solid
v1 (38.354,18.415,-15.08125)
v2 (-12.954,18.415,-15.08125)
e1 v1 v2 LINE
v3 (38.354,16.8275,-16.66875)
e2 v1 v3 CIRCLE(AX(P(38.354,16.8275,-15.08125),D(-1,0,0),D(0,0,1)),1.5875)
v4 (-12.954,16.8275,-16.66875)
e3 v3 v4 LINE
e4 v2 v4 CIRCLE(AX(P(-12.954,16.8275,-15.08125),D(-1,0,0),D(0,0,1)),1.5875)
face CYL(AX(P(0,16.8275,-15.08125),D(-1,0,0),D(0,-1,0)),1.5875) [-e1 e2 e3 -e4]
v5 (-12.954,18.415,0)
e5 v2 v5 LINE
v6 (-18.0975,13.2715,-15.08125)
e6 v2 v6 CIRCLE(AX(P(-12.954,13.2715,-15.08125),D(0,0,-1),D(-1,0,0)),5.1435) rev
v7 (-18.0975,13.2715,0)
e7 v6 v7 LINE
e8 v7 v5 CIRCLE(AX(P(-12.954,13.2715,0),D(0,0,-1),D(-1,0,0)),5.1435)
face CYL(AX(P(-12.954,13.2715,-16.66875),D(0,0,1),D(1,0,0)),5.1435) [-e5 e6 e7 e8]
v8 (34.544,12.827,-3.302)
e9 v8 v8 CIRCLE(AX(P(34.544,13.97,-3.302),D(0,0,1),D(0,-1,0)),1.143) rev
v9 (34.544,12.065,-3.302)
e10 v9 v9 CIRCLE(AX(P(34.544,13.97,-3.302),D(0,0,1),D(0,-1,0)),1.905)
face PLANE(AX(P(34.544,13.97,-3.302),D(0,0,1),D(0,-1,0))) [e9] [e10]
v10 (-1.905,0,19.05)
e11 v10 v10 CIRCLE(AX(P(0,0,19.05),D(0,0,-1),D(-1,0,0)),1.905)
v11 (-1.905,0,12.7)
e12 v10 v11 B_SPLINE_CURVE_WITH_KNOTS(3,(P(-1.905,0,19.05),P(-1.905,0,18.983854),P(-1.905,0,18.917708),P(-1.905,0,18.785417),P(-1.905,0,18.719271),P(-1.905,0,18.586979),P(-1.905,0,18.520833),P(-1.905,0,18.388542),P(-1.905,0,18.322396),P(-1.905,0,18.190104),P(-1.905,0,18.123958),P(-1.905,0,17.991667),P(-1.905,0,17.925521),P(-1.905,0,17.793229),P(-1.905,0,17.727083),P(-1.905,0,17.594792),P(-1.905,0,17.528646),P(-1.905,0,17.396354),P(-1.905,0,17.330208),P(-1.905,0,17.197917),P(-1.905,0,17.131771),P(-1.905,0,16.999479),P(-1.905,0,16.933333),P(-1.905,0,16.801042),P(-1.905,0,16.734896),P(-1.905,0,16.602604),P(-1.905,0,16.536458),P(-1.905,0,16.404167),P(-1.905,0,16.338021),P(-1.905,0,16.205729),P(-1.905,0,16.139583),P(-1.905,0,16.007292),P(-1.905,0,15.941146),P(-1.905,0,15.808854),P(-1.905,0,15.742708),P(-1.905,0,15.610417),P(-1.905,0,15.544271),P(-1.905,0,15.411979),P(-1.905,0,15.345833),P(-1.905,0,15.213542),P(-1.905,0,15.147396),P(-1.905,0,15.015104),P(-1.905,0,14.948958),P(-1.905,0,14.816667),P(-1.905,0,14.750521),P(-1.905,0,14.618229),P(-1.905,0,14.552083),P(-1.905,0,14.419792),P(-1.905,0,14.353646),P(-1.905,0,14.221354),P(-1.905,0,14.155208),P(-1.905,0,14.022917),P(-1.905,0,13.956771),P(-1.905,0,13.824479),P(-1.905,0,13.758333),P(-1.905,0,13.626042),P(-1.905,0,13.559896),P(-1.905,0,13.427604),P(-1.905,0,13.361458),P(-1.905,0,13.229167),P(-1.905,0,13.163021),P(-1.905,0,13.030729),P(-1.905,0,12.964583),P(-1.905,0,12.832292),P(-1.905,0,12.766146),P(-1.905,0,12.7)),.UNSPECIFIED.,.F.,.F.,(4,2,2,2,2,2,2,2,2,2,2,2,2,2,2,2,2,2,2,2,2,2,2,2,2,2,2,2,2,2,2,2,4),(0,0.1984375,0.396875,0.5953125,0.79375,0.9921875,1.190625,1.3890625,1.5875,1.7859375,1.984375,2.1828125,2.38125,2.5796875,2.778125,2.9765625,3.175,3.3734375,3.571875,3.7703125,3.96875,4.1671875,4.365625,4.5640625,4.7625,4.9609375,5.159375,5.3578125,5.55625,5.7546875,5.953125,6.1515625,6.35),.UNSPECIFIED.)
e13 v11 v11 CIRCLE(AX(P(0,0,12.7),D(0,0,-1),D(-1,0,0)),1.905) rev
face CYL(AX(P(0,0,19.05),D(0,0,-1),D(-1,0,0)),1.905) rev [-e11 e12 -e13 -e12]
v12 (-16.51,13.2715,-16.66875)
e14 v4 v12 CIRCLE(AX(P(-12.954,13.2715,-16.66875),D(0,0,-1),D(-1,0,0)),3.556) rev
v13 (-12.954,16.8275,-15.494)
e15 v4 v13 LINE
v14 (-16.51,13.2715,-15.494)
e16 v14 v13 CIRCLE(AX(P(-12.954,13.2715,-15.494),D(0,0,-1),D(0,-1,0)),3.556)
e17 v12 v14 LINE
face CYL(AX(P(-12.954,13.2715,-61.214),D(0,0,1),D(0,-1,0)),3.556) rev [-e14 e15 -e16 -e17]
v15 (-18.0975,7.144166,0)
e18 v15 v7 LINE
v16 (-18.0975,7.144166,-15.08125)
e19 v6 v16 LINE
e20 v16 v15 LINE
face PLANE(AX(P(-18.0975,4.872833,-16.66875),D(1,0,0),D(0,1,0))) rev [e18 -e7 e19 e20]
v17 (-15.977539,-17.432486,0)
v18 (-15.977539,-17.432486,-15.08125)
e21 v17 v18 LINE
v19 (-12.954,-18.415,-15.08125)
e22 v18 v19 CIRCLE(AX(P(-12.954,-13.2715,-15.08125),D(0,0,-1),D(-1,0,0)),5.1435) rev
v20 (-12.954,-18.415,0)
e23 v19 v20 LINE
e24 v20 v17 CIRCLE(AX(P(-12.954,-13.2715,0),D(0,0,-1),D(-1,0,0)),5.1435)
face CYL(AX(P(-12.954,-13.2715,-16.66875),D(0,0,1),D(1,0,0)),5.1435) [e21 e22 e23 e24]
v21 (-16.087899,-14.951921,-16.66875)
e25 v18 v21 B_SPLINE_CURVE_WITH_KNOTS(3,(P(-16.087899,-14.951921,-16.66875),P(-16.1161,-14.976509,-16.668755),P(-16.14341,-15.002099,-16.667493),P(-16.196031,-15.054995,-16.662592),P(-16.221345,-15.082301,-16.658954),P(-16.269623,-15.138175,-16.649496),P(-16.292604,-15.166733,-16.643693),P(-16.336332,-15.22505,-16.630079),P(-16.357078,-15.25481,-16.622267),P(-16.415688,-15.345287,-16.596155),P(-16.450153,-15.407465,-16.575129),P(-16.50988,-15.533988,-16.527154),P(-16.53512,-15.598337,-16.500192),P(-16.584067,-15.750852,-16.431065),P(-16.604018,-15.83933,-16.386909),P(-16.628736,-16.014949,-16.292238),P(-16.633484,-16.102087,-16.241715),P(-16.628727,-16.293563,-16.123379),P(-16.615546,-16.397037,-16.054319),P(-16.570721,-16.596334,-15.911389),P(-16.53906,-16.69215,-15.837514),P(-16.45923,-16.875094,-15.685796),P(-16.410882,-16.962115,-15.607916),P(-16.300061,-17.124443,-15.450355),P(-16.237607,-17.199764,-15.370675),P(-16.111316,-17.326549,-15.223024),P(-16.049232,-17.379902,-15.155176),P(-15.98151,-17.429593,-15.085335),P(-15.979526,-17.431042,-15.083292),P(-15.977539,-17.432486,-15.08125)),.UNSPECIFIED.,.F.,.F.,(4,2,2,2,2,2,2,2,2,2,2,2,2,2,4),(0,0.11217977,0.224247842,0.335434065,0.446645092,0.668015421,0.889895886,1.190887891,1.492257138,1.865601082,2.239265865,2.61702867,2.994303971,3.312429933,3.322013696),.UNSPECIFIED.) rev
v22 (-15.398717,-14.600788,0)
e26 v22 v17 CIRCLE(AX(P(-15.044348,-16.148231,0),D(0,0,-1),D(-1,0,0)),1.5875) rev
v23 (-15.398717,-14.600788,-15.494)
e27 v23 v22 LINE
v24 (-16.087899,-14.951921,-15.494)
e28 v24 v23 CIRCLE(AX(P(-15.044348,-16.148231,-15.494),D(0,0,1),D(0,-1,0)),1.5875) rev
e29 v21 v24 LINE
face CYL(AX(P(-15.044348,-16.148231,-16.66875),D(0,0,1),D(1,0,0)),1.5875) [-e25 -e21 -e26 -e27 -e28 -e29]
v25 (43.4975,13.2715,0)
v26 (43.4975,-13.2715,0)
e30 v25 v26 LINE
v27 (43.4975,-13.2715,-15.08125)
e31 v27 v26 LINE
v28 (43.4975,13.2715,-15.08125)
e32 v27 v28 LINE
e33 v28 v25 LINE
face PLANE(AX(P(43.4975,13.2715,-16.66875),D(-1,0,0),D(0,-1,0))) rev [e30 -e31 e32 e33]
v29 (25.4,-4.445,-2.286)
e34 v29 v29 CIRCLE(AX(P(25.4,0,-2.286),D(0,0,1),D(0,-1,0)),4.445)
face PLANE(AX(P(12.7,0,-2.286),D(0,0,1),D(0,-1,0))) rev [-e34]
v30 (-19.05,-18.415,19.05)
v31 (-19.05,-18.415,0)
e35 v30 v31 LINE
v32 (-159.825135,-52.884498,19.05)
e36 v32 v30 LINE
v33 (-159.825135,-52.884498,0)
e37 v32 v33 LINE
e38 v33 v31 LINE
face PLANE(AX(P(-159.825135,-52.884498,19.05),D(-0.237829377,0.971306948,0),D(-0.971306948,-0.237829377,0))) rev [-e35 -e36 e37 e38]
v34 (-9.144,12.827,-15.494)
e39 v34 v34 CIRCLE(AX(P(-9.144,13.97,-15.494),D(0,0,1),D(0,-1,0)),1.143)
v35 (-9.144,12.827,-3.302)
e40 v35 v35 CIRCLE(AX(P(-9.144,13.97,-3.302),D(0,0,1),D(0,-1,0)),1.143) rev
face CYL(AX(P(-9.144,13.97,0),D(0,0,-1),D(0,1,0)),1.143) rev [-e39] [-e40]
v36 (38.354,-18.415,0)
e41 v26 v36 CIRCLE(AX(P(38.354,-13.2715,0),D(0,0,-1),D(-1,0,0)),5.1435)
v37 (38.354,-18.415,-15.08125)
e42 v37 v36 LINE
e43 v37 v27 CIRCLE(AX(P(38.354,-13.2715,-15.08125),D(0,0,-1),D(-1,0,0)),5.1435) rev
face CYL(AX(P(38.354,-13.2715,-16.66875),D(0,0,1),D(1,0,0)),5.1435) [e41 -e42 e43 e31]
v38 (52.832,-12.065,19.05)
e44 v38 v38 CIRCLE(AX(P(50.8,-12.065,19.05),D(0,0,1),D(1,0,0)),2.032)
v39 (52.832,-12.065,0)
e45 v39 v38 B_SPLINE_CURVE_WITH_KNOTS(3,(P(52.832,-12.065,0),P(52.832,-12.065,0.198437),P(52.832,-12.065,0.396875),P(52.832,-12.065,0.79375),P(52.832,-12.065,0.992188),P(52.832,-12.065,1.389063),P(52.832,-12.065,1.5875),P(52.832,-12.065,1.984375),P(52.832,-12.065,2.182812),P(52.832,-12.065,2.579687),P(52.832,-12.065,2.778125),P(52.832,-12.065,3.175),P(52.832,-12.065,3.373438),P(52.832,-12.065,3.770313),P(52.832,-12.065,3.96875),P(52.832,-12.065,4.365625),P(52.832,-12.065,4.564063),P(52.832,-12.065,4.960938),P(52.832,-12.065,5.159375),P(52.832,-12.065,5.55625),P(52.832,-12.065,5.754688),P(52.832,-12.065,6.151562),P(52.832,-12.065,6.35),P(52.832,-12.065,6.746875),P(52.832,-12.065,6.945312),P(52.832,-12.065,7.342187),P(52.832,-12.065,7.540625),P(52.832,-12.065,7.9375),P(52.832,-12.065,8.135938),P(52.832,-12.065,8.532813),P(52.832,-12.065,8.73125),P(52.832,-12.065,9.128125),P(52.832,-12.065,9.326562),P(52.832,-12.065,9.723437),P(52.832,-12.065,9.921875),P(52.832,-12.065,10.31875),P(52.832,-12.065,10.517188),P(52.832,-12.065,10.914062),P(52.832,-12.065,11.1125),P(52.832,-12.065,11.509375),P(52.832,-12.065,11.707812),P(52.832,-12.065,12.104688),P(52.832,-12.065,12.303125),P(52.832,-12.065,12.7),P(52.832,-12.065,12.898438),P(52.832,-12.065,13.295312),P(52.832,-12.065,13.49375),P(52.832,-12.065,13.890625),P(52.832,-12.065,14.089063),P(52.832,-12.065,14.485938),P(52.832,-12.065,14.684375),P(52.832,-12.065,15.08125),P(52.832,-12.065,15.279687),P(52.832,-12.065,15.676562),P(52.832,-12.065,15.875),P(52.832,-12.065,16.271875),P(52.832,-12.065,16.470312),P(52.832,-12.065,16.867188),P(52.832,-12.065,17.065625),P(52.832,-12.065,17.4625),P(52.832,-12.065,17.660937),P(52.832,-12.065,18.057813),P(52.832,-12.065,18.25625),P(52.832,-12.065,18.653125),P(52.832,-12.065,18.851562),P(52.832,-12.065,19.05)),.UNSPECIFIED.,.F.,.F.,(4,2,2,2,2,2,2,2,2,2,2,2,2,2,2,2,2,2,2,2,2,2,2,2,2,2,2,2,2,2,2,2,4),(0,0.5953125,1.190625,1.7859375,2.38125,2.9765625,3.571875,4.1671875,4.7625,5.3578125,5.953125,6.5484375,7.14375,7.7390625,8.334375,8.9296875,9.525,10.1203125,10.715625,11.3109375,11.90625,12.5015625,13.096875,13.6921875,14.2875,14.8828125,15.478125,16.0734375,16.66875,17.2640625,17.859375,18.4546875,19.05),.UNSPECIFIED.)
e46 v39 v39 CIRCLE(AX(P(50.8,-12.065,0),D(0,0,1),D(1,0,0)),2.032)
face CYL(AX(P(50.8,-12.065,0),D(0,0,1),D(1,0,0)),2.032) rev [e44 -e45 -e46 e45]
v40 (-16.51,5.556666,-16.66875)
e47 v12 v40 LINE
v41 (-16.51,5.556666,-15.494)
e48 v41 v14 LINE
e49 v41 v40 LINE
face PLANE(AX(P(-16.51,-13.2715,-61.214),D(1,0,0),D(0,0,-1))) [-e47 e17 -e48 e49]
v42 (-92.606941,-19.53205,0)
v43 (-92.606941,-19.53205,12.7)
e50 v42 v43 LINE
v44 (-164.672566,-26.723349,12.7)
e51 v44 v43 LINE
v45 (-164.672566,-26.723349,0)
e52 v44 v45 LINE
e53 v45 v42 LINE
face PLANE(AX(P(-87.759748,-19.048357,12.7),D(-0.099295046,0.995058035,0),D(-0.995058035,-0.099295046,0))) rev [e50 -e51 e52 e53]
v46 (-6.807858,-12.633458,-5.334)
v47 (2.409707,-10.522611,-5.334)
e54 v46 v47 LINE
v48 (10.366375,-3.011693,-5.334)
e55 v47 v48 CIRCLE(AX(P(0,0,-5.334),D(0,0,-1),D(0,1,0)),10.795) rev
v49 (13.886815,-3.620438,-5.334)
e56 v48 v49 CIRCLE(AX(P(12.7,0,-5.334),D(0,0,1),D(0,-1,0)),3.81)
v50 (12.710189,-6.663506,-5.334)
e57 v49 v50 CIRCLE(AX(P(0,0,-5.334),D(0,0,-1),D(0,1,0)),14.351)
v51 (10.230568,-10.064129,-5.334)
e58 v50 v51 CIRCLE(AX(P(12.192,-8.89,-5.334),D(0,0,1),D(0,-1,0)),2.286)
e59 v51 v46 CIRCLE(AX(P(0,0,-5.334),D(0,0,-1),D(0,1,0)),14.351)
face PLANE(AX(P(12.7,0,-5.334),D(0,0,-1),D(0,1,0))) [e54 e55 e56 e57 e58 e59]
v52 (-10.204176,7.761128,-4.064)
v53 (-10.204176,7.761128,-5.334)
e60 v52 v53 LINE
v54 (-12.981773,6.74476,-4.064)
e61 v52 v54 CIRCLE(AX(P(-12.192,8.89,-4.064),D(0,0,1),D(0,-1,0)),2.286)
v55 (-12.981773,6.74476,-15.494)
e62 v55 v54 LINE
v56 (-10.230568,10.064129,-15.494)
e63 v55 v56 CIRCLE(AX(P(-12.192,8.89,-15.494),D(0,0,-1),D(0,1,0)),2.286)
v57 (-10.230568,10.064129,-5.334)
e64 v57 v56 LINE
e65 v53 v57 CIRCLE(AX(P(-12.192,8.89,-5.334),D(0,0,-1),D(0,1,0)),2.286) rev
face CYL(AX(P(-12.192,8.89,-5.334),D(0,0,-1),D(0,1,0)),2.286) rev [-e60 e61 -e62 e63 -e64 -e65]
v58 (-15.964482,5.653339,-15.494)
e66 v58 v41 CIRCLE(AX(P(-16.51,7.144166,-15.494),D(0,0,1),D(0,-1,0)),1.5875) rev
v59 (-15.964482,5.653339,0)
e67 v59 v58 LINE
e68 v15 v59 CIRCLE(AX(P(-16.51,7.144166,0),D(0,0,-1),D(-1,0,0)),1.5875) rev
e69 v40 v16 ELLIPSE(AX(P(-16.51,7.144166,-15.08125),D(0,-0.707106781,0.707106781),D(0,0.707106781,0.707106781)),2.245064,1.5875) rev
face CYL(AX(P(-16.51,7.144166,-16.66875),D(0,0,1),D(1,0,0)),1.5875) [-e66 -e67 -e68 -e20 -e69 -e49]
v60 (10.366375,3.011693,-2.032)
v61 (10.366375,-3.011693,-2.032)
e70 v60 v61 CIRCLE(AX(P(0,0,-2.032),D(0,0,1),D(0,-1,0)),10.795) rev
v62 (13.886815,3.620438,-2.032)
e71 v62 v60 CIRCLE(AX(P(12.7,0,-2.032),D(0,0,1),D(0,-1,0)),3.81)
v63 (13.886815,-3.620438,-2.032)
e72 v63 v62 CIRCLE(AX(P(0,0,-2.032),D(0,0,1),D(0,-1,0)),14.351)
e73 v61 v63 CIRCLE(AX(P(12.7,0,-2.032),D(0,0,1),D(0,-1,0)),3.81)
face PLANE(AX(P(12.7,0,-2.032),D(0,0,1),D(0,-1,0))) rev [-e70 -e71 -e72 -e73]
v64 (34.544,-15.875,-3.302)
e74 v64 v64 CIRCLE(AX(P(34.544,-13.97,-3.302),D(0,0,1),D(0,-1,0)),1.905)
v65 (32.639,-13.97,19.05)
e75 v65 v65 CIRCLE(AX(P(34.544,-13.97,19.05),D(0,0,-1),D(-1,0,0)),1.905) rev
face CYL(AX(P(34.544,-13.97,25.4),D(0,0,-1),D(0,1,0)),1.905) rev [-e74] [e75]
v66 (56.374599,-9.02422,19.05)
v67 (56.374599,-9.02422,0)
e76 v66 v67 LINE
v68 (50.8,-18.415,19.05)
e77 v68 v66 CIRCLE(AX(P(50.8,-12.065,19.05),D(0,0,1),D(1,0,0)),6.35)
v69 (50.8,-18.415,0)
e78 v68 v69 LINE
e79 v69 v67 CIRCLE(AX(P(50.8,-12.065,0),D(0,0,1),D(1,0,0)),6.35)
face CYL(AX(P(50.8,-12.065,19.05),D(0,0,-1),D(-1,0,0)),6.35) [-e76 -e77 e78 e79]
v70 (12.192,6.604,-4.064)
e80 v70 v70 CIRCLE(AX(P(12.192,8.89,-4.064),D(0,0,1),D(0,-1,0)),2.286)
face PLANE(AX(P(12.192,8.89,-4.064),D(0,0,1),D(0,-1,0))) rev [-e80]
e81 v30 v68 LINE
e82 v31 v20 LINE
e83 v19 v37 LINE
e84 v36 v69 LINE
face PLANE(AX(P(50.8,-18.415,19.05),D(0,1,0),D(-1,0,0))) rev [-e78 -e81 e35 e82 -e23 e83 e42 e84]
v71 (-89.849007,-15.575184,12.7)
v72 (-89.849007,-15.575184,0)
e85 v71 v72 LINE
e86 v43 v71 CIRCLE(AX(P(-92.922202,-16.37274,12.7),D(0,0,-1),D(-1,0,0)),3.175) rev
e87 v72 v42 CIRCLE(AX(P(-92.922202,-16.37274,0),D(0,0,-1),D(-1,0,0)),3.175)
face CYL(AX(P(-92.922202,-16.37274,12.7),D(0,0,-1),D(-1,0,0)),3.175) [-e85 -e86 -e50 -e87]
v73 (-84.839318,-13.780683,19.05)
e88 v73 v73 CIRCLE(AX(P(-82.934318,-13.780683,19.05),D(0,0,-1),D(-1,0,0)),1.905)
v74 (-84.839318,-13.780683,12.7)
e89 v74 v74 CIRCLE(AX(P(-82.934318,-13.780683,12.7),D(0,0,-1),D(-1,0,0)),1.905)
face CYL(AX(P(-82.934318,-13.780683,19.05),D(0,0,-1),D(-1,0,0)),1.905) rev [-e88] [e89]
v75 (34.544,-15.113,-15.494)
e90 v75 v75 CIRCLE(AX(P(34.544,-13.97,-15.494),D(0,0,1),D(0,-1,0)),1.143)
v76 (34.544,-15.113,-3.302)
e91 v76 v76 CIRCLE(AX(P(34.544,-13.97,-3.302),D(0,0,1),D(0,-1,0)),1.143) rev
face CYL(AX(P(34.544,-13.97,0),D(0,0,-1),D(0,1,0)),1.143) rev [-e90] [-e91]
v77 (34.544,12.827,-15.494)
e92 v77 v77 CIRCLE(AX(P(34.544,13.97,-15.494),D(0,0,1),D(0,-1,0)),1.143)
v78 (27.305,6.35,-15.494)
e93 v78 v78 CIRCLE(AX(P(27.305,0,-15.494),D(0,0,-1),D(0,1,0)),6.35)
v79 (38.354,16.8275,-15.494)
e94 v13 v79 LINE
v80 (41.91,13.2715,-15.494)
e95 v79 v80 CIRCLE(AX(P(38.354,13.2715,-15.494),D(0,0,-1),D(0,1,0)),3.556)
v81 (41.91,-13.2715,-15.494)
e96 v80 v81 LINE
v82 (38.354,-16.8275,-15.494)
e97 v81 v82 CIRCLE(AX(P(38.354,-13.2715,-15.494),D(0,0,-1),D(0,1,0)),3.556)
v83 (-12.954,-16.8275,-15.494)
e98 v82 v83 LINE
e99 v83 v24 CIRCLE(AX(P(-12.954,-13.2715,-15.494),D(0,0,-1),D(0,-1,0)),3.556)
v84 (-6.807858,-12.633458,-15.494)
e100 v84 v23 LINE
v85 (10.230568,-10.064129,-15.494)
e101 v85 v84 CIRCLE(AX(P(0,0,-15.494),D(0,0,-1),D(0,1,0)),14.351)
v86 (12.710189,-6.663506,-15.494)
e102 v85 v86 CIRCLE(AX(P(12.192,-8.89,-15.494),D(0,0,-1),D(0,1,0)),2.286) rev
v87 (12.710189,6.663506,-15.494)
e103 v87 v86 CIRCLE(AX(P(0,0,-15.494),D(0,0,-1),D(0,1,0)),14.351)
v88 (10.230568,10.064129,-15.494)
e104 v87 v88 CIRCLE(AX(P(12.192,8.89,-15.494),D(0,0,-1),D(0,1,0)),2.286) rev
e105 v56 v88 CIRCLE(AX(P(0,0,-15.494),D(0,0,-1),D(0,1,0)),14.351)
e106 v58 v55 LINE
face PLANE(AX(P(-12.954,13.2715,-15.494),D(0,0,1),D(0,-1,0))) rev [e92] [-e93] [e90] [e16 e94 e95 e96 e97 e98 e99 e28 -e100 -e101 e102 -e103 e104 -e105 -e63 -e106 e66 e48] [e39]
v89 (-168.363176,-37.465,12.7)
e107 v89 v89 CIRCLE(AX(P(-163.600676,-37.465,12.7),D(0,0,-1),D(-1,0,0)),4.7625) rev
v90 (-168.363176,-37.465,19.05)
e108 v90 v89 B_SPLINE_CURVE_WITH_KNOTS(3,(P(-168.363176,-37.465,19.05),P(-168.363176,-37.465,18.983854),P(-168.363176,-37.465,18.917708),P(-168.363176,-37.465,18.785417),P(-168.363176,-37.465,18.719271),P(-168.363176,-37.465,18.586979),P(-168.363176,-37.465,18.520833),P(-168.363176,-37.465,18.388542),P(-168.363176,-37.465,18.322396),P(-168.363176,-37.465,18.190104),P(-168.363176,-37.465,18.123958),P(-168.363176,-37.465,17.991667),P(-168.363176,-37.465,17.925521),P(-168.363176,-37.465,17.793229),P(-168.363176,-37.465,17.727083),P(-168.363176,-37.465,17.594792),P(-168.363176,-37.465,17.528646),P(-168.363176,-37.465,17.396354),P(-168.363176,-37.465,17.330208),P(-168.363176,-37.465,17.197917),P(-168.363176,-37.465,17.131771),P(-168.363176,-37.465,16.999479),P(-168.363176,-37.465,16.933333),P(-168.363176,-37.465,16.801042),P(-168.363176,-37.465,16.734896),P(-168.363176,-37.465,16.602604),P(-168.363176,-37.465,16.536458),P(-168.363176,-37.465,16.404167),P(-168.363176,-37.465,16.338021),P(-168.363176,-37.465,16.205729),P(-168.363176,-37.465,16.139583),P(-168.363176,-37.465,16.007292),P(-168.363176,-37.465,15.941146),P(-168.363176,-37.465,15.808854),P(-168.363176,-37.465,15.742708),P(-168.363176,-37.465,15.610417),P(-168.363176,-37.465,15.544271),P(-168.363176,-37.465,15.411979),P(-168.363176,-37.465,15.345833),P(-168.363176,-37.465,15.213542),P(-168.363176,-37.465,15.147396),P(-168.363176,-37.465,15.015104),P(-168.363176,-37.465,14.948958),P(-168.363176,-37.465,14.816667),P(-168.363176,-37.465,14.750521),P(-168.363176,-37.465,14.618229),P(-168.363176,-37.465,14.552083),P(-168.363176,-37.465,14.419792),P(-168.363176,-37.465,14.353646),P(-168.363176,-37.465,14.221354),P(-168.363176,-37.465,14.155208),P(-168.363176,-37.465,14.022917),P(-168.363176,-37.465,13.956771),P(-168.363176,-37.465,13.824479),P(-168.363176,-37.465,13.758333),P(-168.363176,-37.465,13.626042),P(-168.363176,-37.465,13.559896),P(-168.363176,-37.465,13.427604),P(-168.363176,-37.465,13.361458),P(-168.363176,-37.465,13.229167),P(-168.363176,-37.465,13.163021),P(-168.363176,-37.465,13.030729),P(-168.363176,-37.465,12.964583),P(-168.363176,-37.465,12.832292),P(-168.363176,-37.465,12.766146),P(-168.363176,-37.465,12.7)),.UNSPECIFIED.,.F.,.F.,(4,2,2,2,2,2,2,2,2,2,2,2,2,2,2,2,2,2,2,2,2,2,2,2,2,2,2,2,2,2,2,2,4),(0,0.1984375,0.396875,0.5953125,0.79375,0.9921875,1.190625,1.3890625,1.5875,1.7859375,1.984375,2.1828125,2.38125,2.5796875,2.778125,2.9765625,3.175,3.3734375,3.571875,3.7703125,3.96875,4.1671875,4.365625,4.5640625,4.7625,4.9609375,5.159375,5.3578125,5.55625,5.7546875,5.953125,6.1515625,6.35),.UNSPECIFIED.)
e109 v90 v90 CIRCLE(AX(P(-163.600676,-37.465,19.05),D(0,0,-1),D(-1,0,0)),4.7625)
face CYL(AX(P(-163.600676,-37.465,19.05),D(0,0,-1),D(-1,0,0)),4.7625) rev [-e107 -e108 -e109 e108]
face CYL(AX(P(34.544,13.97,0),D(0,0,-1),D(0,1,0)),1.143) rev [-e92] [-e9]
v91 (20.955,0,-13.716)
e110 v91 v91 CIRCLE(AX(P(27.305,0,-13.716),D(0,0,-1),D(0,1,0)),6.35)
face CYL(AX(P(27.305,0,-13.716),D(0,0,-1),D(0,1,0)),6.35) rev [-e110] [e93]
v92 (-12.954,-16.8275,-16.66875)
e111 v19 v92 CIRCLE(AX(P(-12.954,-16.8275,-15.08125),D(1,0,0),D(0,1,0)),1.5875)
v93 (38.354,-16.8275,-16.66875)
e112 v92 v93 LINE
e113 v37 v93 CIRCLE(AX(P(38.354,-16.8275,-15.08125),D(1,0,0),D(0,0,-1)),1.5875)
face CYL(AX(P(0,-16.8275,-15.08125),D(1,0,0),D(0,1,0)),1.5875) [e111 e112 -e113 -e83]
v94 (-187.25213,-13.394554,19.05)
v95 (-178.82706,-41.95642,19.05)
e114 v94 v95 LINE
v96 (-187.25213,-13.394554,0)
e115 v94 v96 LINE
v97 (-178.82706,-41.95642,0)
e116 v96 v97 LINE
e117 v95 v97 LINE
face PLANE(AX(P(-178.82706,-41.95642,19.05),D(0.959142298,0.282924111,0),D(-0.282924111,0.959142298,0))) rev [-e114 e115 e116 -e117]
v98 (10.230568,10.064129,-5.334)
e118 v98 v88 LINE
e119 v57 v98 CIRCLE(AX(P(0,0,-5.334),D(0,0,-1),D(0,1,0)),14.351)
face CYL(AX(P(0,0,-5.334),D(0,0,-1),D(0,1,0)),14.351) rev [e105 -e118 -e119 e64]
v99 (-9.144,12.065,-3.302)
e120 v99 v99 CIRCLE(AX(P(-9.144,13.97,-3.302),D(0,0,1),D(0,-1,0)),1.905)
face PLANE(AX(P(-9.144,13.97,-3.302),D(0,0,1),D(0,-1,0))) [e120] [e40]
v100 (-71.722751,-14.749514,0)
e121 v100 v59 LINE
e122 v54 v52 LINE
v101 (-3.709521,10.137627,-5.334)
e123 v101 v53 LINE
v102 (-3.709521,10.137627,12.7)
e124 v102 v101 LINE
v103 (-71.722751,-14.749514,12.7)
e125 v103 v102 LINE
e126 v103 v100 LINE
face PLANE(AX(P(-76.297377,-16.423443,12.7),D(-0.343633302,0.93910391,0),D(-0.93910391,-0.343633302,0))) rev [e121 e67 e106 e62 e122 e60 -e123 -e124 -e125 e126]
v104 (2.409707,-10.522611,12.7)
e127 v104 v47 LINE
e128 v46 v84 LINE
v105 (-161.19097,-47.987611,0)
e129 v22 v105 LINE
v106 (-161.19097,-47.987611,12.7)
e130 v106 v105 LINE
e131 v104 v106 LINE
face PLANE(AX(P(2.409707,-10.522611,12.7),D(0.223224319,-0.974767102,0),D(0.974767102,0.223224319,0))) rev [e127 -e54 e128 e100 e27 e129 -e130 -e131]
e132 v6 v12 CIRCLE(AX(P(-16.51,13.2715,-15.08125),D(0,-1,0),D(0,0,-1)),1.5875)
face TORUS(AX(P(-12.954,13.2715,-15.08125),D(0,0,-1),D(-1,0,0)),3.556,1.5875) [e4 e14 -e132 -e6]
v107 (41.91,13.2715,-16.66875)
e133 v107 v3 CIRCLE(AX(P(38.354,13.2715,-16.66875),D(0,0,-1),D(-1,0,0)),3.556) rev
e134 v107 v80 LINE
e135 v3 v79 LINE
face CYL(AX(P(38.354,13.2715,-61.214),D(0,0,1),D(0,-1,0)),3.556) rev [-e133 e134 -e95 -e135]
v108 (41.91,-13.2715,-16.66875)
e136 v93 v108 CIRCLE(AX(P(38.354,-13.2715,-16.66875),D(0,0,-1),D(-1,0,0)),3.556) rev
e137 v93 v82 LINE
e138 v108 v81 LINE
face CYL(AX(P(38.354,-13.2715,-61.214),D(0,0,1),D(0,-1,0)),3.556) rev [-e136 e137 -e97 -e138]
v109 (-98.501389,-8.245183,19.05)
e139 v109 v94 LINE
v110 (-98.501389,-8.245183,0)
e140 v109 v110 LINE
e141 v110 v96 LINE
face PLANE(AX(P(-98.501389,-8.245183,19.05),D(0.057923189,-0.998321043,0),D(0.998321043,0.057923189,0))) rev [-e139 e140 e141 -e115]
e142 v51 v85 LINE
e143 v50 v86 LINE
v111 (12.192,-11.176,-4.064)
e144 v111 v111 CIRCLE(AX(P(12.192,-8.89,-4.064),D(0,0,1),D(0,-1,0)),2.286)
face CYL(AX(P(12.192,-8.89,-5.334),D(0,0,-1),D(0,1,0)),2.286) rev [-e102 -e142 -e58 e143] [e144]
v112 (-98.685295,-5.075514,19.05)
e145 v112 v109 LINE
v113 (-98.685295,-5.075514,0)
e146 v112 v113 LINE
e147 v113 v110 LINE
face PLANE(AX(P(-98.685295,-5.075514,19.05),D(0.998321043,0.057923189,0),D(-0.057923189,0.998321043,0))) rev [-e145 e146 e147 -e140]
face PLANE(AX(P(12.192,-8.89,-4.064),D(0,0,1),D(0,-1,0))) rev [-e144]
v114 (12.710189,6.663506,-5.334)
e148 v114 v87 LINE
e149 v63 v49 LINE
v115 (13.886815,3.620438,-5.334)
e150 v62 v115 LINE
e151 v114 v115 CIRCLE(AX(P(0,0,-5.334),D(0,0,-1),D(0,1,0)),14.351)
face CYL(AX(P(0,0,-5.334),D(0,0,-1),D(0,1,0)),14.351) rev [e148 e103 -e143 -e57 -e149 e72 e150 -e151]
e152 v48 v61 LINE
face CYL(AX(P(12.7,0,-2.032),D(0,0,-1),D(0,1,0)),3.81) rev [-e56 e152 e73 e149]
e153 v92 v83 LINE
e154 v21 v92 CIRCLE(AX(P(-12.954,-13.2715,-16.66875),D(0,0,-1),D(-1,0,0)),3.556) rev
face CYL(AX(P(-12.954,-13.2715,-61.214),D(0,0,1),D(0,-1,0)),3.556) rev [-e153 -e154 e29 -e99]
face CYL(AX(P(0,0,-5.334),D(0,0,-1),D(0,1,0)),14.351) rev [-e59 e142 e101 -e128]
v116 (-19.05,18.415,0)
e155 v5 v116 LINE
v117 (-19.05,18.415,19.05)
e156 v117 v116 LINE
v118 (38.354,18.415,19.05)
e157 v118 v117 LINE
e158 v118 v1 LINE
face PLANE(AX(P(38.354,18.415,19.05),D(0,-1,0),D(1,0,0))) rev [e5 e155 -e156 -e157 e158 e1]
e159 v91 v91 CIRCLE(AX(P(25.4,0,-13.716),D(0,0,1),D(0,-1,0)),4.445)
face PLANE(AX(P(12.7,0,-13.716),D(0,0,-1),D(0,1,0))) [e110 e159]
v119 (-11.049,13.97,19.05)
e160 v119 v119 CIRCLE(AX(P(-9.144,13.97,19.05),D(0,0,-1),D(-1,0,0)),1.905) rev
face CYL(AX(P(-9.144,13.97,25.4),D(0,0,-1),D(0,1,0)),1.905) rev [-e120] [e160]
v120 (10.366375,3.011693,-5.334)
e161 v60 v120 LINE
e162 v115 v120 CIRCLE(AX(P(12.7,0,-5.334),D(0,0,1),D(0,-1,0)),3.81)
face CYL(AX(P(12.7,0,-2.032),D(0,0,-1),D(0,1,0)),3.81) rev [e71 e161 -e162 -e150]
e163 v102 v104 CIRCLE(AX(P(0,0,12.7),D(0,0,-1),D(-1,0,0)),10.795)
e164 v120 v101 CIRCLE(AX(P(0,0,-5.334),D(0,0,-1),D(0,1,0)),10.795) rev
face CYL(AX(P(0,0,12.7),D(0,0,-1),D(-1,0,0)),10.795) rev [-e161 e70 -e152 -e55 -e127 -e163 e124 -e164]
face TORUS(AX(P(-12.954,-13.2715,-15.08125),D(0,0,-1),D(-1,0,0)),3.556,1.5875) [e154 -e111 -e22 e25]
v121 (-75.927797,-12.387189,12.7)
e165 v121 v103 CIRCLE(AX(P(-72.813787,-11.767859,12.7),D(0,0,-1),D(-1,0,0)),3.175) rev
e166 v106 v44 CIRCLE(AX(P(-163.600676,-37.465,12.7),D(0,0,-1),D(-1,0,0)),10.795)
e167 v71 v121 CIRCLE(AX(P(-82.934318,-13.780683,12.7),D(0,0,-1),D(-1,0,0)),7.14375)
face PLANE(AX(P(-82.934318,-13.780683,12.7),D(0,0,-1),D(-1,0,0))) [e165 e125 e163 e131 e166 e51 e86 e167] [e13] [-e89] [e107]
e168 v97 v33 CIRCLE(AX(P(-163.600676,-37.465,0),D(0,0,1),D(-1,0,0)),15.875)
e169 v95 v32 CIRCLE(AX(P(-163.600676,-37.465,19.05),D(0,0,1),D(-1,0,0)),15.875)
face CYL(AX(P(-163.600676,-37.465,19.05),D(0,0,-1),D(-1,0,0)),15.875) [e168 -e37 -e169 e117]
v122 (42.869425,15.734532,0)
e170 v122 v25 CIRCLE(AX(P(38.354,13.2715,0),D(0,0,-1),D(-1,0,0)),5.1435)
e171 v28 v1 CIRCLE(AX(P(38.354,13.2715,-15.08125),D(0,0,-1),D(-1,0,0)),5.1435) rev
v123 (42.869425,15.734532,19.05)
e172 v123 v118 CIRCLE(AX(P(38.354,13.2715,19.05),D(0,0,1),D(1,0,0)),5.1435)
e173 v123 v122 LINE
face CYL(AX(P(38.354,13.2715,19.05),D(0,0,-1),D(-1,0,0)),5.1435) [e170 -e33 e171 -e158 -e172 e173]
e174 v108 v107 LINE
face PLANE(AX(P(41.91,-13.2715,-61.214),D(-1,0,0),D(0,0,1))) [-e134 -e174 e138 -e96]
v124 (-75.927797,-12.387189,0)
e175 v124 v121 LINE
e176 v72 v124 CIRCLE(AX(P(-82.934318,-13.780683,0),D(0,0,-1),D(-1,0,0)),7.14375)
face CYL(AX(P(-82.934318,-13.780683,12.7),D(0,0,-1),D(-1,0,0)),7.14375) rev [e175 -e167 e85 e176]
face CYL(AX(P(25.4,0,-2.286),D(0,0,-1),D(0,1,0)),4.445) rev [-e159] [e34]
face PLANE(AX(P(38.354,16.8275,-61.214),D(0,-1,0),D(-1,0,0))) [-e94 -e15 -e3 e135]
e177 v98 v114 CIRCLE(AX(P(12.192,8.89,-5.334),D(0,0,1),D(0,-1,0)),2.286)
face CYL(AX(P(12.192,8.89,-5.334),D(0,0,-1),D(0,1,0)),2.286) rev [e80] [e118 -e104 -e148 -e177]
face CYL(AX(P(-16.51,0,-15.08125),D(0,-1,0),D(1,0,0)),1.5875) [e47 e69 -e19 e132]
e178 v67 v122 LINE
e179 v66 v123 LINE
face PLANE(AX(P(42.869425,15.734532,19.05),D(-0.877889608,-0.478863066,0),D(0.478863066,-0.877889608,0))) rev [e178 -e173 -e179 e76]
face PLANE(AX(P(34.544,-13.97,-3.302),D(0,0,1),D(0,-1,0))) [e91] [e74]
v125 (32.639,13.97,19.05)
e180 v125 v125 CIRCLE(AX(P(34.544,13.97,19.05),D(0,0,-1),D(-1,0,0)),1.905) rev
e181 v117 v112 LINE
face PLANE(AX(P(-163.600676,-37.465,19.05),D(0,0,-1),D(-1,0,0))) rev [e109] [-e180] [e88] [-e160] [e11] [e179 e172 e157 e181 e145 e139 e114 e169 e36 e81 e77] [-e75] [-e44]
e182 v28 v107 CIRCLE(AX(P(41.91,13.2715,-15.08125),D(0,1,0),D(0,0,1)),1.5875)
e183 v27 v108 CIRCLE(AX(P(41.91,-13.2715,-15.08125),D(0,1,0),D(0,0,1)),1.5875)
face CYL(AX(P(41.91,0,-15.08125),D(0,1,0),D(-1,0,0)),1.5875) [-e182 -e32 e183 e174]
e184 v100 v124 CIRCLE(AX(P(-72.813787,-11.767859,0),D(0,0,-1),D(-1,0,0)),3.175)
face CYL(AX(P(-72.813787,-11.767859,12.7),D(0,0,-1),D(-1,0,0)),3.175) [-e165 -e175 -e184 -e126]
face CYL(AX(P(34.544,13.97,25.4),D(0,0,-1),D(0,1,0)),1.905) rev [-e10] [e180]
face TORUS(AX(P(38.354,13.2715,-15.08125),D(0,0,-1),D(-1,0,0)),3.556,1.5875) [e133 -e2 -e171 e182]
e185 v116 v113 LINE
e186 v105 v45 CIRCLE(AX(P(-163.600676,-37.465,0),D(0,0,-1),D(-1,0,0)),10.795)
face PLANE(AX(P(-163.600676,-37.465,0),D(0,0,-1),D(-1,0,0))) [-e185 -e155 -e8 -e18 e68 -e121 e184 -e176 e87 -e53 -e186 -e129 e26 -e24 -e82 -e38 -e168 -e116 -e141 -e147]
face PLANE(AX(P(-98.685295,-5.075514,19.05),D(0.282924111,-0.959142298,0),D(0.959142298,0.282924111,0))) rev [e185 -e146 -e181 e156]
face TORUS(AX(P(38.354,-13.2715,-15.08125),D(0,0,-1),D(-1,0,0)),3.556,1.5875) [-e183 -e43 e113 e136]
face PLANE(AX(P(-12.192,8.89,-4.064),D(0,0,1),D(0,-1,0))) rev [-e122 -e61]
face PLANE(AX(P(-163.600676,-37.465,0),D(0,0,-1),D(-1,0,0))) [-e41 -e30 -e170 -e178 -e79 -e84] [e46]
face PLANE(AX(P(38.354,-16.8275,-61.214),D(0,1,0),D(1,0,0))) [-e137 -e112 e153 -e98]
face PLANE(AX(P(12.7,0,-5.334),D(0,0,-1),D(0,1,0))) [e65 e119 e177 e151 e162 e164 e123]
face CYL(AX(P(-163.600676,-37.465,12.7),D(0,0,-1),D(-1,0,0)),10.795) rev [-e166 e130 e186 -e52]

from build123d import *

# Parameters (mm, degrees)
BOSS_EXTRUDE1_DEPTH   = 19.05
SKETCH2_R             = 5.9944
CUT_EXTRUDE1_DEPTH    = 3.556
SKETCH3_R             = 4.7625
SKETCH3_R_2           = 1.905
CUT_EXTRUDE2_DEPTH    = 196.316614101
SKETCH4_R             = 2.032
CUT_EXTRUDE3_DEPTH    = 196.630821212
CUT_EXTRUDE4_DEPTH    = 12.7
BOSS_EXTRUDE2_START   = 16.66875
BOSS_EXTRUDE2_DEPTH   = 16.66875
CAVITY1_START         = -16.66875
CAVITY1_OUTLINE_R     = 1.143
CAVITY1_OUTLINE_R_2   = 4.445
CAVITY1_DEPTH         = 11.33475
CAVITY1_2_OUTLINE_R   = 1.143
CAVITY1_2_OUTLINE_R_2 = 4.445
CAVITY1_2_DEPTH       = 1.17475
CAVITY1_START_2       = -3.302
CAVITY1_3_OUTLINE_R   = 1.905
CAVITY1_3_DEPTH       = 22.352
CAVITY1_START_3       = -5.334
CAVITY1_4_OUTLINE_R   = 1.143
CAVITY1_4_OUTLINE_R_2 = 4.445
CAVITY1_4_DEPTH       = 3.048
CAVITY1_START_4       = -15.494
CAVITY1_5_DEPTH       = 1.778
CAVITY1_6_OUTLINE_R   = 2.286
CAVITY1_6_DEPTH       = 1.27
CAVITY1_START_5       = -2.286
CAVITY1_7_DEPTH       = 0.254
SKETCH10_R            = 1.905
CUT_EXTRUDE7_DEPTH    = 197.903629181
FILLET1_R             = 3.175
BOSS_EXTRUDE3_START   = -6.35
SKETCH12_R            = 1.905
BOSS_EXTRUDE3_DEPTH   = 6.35
BOSS_EXTRUDE4_DEPTH   = 28.194
FILLET2_R             = 1.5875


# Read off the part's stored shape, not the designer's step: Cavity1
with BuildPart() as part:
    # Sketch1 → Boss-Extrude1 (new body)
    with BuildSketch(Plane.XY):
        with BuildLine():
            Line((-159.825134937, -52.884497799), (-19.05, -18.415))
            Line((-19.05, -18.415), (50.8, -18.415))
            ThreePointArc((50.8, -18.415), (56.260378007, -15.306415126), (56.374599012, -9.024219533))
            Line((56.374599012, -9.024219533), (42.8694252, 15.734532178))
            ThreePointArc((42.8694252, 15.734532178), (40.979546252, 17.694406186), (38.354, 18.415))
            Line((38.354, 18.415), (-19.05, 18.415))
            Line((-19.05, 18.415), (-98.68529522, -5.075513517))
            Line((-98.68529522, -5.075513517), (-98.501389094, -8.245182827))
            Line((-98.501389094, -8.245182827), (-187.252129782, -13.394554368))
            Line((-187.252129782, -13.394554368), (-178.827060282, -41.956420263))
            ThreePointArc((-178.827060282, -41.956420263), (-171.514977839, -51.226520854), (-159.825134937, -52.884497799))
        make_face()
    extrude(amount=BOSS_EXTRUDE1_DEPTH)

    # Sketch2 → Cut-Extrude1 (cut)
    with BuildSketch(Plane.XY):
        with Locations((-163.600676305, -37.465)):
            Circle(SKETCH2_R)
    extrude(amount=CUT_EXTRUDE1_DEPTH, mode=Mode.SUBTRACT)

    # Sketch3 → Cut-Extrude2 (cut, through all)
    with BuildSketch(Plane(origin=(0, 0, 3.556), x_dir=(-1, 0, 0), z_dir=(0, 0, -1))):
        with Locations((163.600676305, -37.465)):
            Circle(SKETCH3_R)
        Circle(SKETCH3_R_2)
    extrude(amount=-CUT_EXTRUDE2_DEPTH, mode=Mode.SUBTRACT)

    # Sketch4 → Cut-Extrude3 (cut, through all)
    with BuildSketch(Plane.XY.offset(19.05)):
        with Locations((50.8, -12.065)):
            Circle(SKETCH4_R)
    extrude(amount=-CUT_EXTRUDE3_DEPTH, mode=Mode.SUBTRACT)

    # Sketch7 → Cut-Extrude4 (cut)
    with BuildSketch(Plane(origin=(0, 0, 0), x_dir=(-1, 0, 0), z_dir=(0, 0, -1))):
        with BuildLine():
            Line((-2.409706519, -10.522610869), (161.190969786, -47.987610869))
            ThreePointArc((161.190969786, -47.987610869), (174.253828499, -39.209240042), (164.672566331, -26.723348508))
            Line((164.672566331, -26.723348508), (87.759747737, -19.048357079))
            ThreePointArc((87.759747737, -19.048357079), (84.528976417, -6.817190634), (76.297376786, -16.423442945))
            Line((76.297376786, -16.423442945), (3.709521491, 10.13762671))
            ThreePointArc((3.709521491, 10.13762671), (-10.350542688, 3.065663233), (-2.409706519, -10.522610869))
        make_face()
    extrude(amount=-CUT_EXTRUDE4_DEPTH, mode=Mode.SUBTRACT)

    # Sketch11 → Boss-Extrude2 (add)
    with BuildSketch(Plane(origin=(0, 0, 0), x_dir=(-1, 0, 0), z_dir=(0, 0, -1)).offset(BOSS_EXTRUDE2_START)):
        with BuildLine():
            Line((-2.409706519, -10.522610869), (17.746699442, -15.138482675))
            ThreePointArc((17.746699442, -15.138482675), (15.856823355, -17.517581584), (12.954, -18.415))
            Line((12.954, -18.415), (-38.354, -18.415))
            ThreePointArc((-38.354, -18.415), (-41.991003729, -16.908503729), (-43.4975, -13.2715))
            Line((-43.4975, -13.2715), (-43.4975, 13.2715))
            ThreePointArc((-43.4975, 13.2715), (-41.991003729, 16.908503729), (-38.354, 18.415))
            Line((-38.354, 18.415), (12.954, 18.415))
            ThreePointArc((12.954, 18.415), (16.591003729, 16.908503729), (18.0975, 13.2715))
            Line((18.0975, 13.2715), (18.0975, 4.872832788))
            Line((18.0975, 4.872832788), (3.709521491, 10.13762671))
            ThreePointArc((3.709521491, 10.13762671), (-10.350542688, 3.065663233), (-2.409706519, -10.522610869))
        make_face()
    extrude(amount=-BOSS_EXTRUDE2_DEPTH)

    # Cavity1 outline → Cavity1 (cut)
    with BuildSketch(Plane.XY.offset(CAVITY1_START)):
        with Locations((34.544, 13.97)):
            Circle(CAVITY1_OUTLINE_R)
        with Locations((25.4, 0)):
            Circle(CAVITY1_OUTLINE_R_2)
        with BuildLine():
            ThreePointArc((-3.709521491, 10.13762671), (10.350542688, 3.065663233), (2.409706519, -10.522610869))
            Line((2.409706519, -10.522610869), (-6.807858195, -12.633458267))
            ThreePointArc((-6.807858195, -12.633458267), (2.139882746, -14.190563866), (10.230567504, -10.064128852))
            ThreePointArc((10.230567504, -10.064128852), (14.039105214, -10.236847552), (12.710188518, -6.663505747))
            ThreePointArc((12.710188518, -6.663505747), (14.351, 0), (12.710188518, 6.663505747))
            ThreePointArc((12.710188518, 6.663505747), (14.039105214, 10.236847552), (10.230567504, 10.064128852))
            ThreePointArc((10.230567504, 10.064128852), (0, 14.351), (-10.230567504, 10.064128852))
            ThreePointArc((-10.230567504, 10.064128852), (-13.9520423, 10.348782747), (-12.981772977, 6.744760003))
            Line((-12.981772977, 6.744760003), (-3.709521491, 10.13762671))
        make_face()
        with Locations((34.544, -13.97)):
            Circle(CAVITY1_OUTLINE_R)
        with BuildLine():
            ThreePointArc((-10.131608702, -13.394606177), (-8.888854604, -15.084158798), (-8.505216462, -13.022157929))
            Line((-8.505216462, -13.022157929), (-10.131608702, -13.394606177))
        make_face()
        with Locations((-9.144, 13.97)):
            Circle(CAVITY1_OUTLINE_R)
    extrude(amount=CAVITY1_DEPTH, mode=Mode.SUBTRACT)

    # Cavity1 2 outline → Cavity1 2 (cut)
    with BuildSketch(Plane.XY.offset(CAVITY1_START)):
        with BuildLine():
            Line((38.354, 16.8275), (-12.954, 16.8275))
            ThreePointArc((-12.954, 16.8275), (-15.468471714, 15.785971714), (-16.51, 13.2715))
            Line((-16.51, 13.2715), (-16.51, 5.4537247))
            Line((-16.51, 5.4537247), (-12.981772977, 6.744760003))
            ThreePointArc((-12.981772977, 6.744760003), (-13.9520423, 10.348782747), (-10.230567504, 10.064128852))
            ThreePointArc((-10.230567504, 10.064128852), (0, 14.351), (10.230567504, 10.064128852))
            ThreePointArc((10.230567504, 10.064128852), (14.039105214, 10.236847552), (12.710188518, 6.663505747))
            ThreePointArc((12.710188518, 6.663505747), (14.351, 0), (12.710188518, -6.663505747))
            ThreePointArc((12.710188518, -6.663505747), (14.039105214, -10.236847552), (10.230567504, -10.064128852))
            ThreePointArc((10.230567504, -10.064128852), (2.139882746, -14.190563866), (-6.807858195, -12.633458267))
            Line((-6.807858195, -12.633458267), (-8.505216462, -13.022157929))
            ThreePointArc((-8.505216462, -13.022157929), (-8.888854604, -15.084158798), (-10.131608702, -13.394606177))
            Line((-10.131608702, -13.394606177), (-16.174869251, -14.778529285))
            ThreePointArc((-16.174869251, -14.778529285), (-14.862682774, -16.271844325), (-12.954, -16.8275))
            Line((-12.954, -16.8275), (38.354, -16.8275))
            ThreePointArc((38.354, -16.8275), (40.868471714, -15.785971714), (41.91, -13.2715))
            Line((41.91, -13.2715), (41.91, 13.2715))
            ThreePointArc((41.91, 13.2715), (40.868471714, 15.785971714), (38.354, 16.8275))
        make_face()
        with Locations((34.544, 13.97)):
            Circle(CAVITY1_2_OUTLINE_R, mode=Mode.SUBTRACT)
        with Locations((25.4, 0)):
            Circle(CAVITY1_2_OUTLINE_R_2, mode=Mode.SUBTRACT)
        with Locations((-9.144, 13.97)):
            Circle(CAVITY1_2_OUTLINE_R, mode=Mode.SUBTRACT)
        with Locations((34.544, -13.97)):
            Circle(CAVITY1_2_OUTLINE_R, mode=Mode.SUBTRACT)
    extrude(amount=CAVITY1_2_DEPTH, mode=Mode.SUBTRACT)

    # Cavity1 3 outline → Cavity1 3 (cut)
    with BuildSketch(Plane.XY.offset(CAVITY1_START_2)):
        with Locations((34.544, 13.97)):
            Circle(CAVITY1_3_OUTLINE_R)
        with Locations((-9.144, 13.97)):
            Circle(CAVITY1_3_OUTLINE_R)
        with Locations((34.544, -13.97)):
            Circle(CAVITY1_3_OUTLINE_R)
        with Locations((-9.144, -13.97)):
            Circle(CAVITY1_3_OUTLINE_R)
    extrude(amount=CAVITY1_3_DEPTH, mode=Mode.SUBTRACT)

    # Cavity1 4 outline → Cavity1 4 (cut)
    with BuildSketch(Plane.XY.offset(CAVITY1_START_3)):
        with Locations((34.544, 13.97)):
            Circle(CAVITY1_4_OUTLINE_R)
        with Locations((25.4, 0)):
            Circle(CAVITY1_4_OUTLINE_R_2)
        with BuildLine():
            ThreePointArc((13.886815, 3.62043784), (12.050819068, 3.7542861), (10.366375, 3.011692939))
            ThreePointArc((10.366375, 3.011692939), (10.795, 0), (10.366375, -3.011692939))
            ThreePointArc((10.366375, -3.011692939), (12.050819068, -3.7542861), (13.886815, -3.62043784))
            ThreePointArc((13.886815, -3.62043784), (14.351, 0), (13.886815, 3.62043784))
        make_face()
        with Locations((34.544, -13.97)):
            Circle(CAVITY1_4_OUTLINE_R)
        with BuildLine():
            ThreePointArc((-10.131608702, -13.394606177), (-8.888854604, -15.084158798), (-8.505216462, -13.022157929))
            Line((-8.505216462, -13.022157929), (-10.131608702, -13.394606177))
        make_face()
        with Locations((-9.144, 13.97)):
            Circle(CAVITY1_4_OUTLINE_R)
    extrude(amount=CAVITY1_4_DEPTH, mode=Mode.SUBTRACT)

    # Cavity1 5 outline → Cavity1 5 (cut)
    with BuildSketch(Plane.XY.offset(CAVITY1_START_4)):
        with BuildLine():
            Line((24.389058667, 4.328512749), (26.298725966, 6.269761763))
            ThreePointArc((26.298725966, 6.269761763), (22.907666788, 4.581043617), (21.081648335, 1.261900966))
            Line((21.081648335, 1.261900966), (21.132941906, 1.245086431))
            ThreePointArc((21.132941906, 1.245086431), (22.343662494, 3.227510813), (24.389058667, 4.328512749))
        make_face()
        with BuildLine():
            ThreePointArc((33.067669635, 2.667234274), (30.288349771, 5.605544054), (26.298725966, 6.269761763))
            Line((26.298725966, 6.269761763), (24.389058667, 4.328512749))
            ThreePointArc((24.389058667, 4.328512749), (27.514880595, 3.909642575), (29.576068938, 1.522653349))
            Line((29.576068938, 1.522653349), (33.067669635, 2.667234274))
        make_face()
        with BuildLine():
            ThreePointArc((33.655, 0), (33.506429359, 1.365567248), (33.067669635, 2.667234274))
            Line((33.067669635, 2.667234274), (29.576068938, 1.522653349))
            ThreePointArc((29.576068938, 1.522653349), (29.777250931, 0.773110137), (29.845, 0))
            ThreePointArc((29.845, 0), (29.777250931, -0.773110137), (29.576068938, -1.522653349))
            Line((29.576068938, -1.522653349), (33.067669635, -2.667234274))
            ThreePointArc((33.067669635, -2.667234274), (33.506429359, -1.365567248), (33.655, 0))
        make_face()
        with BuildLine():
            Line((21.132941906, 1.245086431), (21.081648335, 1.261900966))
            ThreePointArc((21.081648335, 1.261900966), (21.048043509, 1.083049155), (21.019577582, 0.903307826))
            Line((21.019577582, 0.903307826), (21.055488936, 0.939813075))
            ThreePointArc((21.055488936, 0.939813075), (21.091510845, 1.093135949), (21.132941906, 1.245086431))
        make_face()
        with BuildLine():
            Line((21.055488936, 0.939813075), (21.019577582, 0.903307826))
            ThreePointArc((21.019577582, 0.903307826), (20.971164974, 0.452806658), (20.955, 1.03e-07))
            ThreePointArc((20.955, 1.03e-07), (20.980193636, 0.472585134), (21.055488936, 0.939813075))
        make_face()
        with BuildLine():
            ThreePointArc((26.298725967, -6.269761763), (30.288349771, -5.605544054), (33.067669635, -2.667234274))
            Line((33.067669635, -2.667234274), (29.576068938, -1.522653349))
            ThreePointArc((29.576068938, -1.522653349), (27.514880596, -3.909642575), (24.389058668, -4.32851275))
            Line((24.389058668, -4.32851275), (26.298725967, -6.269761763))
        make_face()
        with BuildLine():
            ThreePointArc((21.055488936, -0.939813075), (20.980193626, -0.472585032), (20.955, 1.03e-07))
            ThreePointArc((20.955, 1.03e-07), (20.971164967, -0.452806555), (21.019577582, -0.903307826))
            Line((21.019577582, -0.903307826), (21.055488936, -0.939813075))
        make_face()
        with BuildLine():
            ThreePointArc((21.081648335, -1.261900966), (22.907666788, -4.581043617), (26.298725967, -6.269761763))
            Line((26.298725967, -6.269761763), (24.389058668, -4.32851275))
            ThreePointArc((24.389058668, -4.32851275), (22.343662494, -3.227510813), (21.132941906, -1.245086431))
            Line((21.132941906, -1.245086431), (21.081648335, -1.261900966))
        make_face()
        with BuildLine():
            Line((21.055488936, -0.939813075), (21.019577582, -0.903307826))
            ThreePointArc((21.019577582, -0.903307826), (21.048043509, -1.083049155), (21.081648335, -1.261900966))
            Line((21.081648335, -1.261900966), (21.132941906, -1.245086431))
            ThreePointArc((21.132941906, -1.245086431), (21.091510845, -1.093135949), (21.055488936, -0.939813075))
        make_face()
    extrude(amount=CAVITY1_5_DEPTH, mode=Mode.SUBTRACT)

    # Cavity1 6 outline → Cavity1 6 (cut)
    with BuildSketch(Plane.XY.offset(CAVITY1_START_3)):
        with Locations((12.192, 8.89)):
            Circle(CAVITY1_6_OUTLINE_R)
        with BuildLine():
            Line((-12.981772977, 6.744760003), (-10.204176339, 7.761127513))
            ThreePointArc((-10.204176339, 7.761127513), (-12.977545727, 11.036791539), (-12.981772977, 6.744760003))
        make_face()
        with Locations((12.192, -8.89)):
            Circle(CAVITY1_6_OUTLINE_R)
    extrude(amount=CAVITY1_6_DEPTH, mode=Mode.SUBTRACT)

    # Cavity1 7 outline → Cavity1 7 (cut)
    with BuildSketch(Plane.XY.offset(CAVITY1_START_5)):
        with BuildLine():
            ThreePointArc((13.886815, 3.62043784), (12.050819068, 3.7542861), (10.366375, 3.011692939))
            ThreePointArc((10.366375, 3.011692939), (10.795, 0), (10.366375, -3.011692939))
            ThreePointArc((10.366375, -3.011692939), (12.050819068, -3.7542861), (13.886815, -3.62043784))
            ThreePointArc((13.886815, -3.62043784), (14.351, 0), (13.886815, 3.62043784))
        make_face()
    extrude(amount=CAVITY1_7_DEPTH, mode=Mode.SUBTRACT)

    # Sketch10 → Cut-Extrude7 (cut, through all)
    with BuildSketch(Plane(origin=(0, 0, 12.7), x_dir=(-1, 0, 0), z_dir=(0, 0, -1))):
        with Locations((82.934317691, -13.780683121)):
            Circle(SKETCH10_R)
    extrude(amount=-CUT_EXTRUDE7_DEPTH, mode=Mode.SUBTRACT)

    # Fillet1
    fillet1_edges = [part.edges().sort_by_distance(p)[0] for p in [
        (-76.297376786, -16.423442945, 6.35),
        (-87.759747737, -19.048357079, 6.35),
    ]]
    fillet(fillet1_edges, radius=FILLET1_R)

    # Sketch12 → Boss-Extrude3 (add)
    with BuildSketch(Plane.XY.offset(19.05).offset(BOSS_EXTRUDE3_START)):
        with Locations((-9.144, -13.97)):
            Circle(SKETCH12_R)
    extrude(amount=BOSS_EXTRUDE3_DEPTH)

    # Sketch13 → Boss-Extrude4 (add)
    with BuildSketch(Plane(origin=(0, 0, -15.494), x_dir=(-1, 0, 0), z_dir=(0, 0, -1))):
        with BuildLine():
            Line((7.624856541, -12.820553111), (11.011968624, -13.596210994))
            ThreePointArc((11.011968624, -13.596210994), (8.718757673, -15.82693133), (7.624856541, -12.820553111))
        make_face()
    extrude(amount=-BOSS_EXTRUDE4_DEPTH)

    # Fillet2
    # the kernel refuses this fillet: 1.5875 mm, written as the material it takes off along each edge
    with BuildSketch(Plane(origin=(-17.746699442, -15.138482675, -23.911150838), x_dir=(0.6106954034242549, -0.7918655973310663, 0), z_dir=(0, 0, 1))) as fillet2_piece_1:
        with BuildLine():
            CenterArc((2.449898555, 1.523250477), FILLET2_R, 155.258681488, 131.097858692)
            Line((1.008120579, 2.187654359), (0, 0))
            ThreePointArc((0, 0), (1.448480168, -0.208168456), (2.896960335, 0))
        make_face()
    extrude(amount=23.911150838, mode=Mode.SUBTRACT)
    with BuildSketch(Plane(origin=(-18.0975, 4.872832788, -22.347082939), x_dir=(0, 1, 0), z_dir=(0, 0, 1))) as fillet2_piece_2:
        with BuildLine():
            CenterArc((FILLET2_R * 1.43076105538, -FILLET2_R), FILLET2_R, 90, 110.098389725)
            Line((FILLET2_R * 0.491657145245, -FILLET2_R * 1.34363330159), (0, 0))
            Line((0, 0), (FILLET2_R * 1.43076105538, 0))
        make_face()
    extrude(amount=22.347082939, mode=Mode.SUBTRACT)
    with BuildSketch(Plane(origin=(-18.0975, 13.2715, -16.66875), x_dir=(1, 0, 0), z_dir=(0, -1, 0))) as fillet2_piece_3:
        with BuildLine():
            CenterArc((FILLET2_R, FILLET2_R), FILLET2_R, 180, 90)
            Line((0, FILLET2_R), (0, 0))
            Line((0, 0), (FILLET2_R, 0))
        make_face()
    extrude(amount=12.367417212, mode=Mode.SUBTRACT)
    with BuildSketch(Plane(origin=(-12.954, 13.2715, -16.66875), x_dir=(0, 1, 0), z_dir=(1, 0, 0))) as fillet2_piece_4:
        with BuildLine():
            CenterArc((5.1435 - FILLET2_R, FILLET2_R), FILLET2_R, 270, 90)
            Line((5.1435, FILLET2_R), (5.1435, 0))
            Line((5.1435, 0), (5.1435 - FILLET2_R, 0))
        make_face()
    revolve(axis=Axis((-12.954, 13.2715, -16.66875), (0, 0, 1)), revolution_arc=90, mode=Mode.SUBTRACT)
    with BuildSketch(Plane(origin=(-12.954, -13.2715, -16.66875), x_dir=(-0.920935313965131, 0.3897154699161245, 0), z_dir=(0.3897154699161245, 0.920935313965131, 0))) as fillet2_piece_5:
        with BuildLine():
            CenterArc((5.1435 - FILLET2_R, FILLET2_R), FILLET2_R, 270, 90)
            Line((5.1435, FILLET2_R), (5.1435, 0))
            Line((5.1435, 0), (5.1435 - FILLET2_R, 0))
        make_face()
    revolve(axis=Axis((-12.954, -13.2715, -16.66875), (0, 0, 1)), revolution_arc=112.93679627, mode=Mode.SUBTRACT)
    with BuildSketch(Plane(origin=(-12.954, -18.415, -16.66875), x_dir=(0, 1, 0), z_dir=(1, 0, 0)), Plane(origin=(38.354, 18.415, -16.66875), x_dir=(0, -1, 0), z_dir=(-1, 0, 0))) as fillet2_piece_6:
        with BuildLine():
            CenterArc((FILLET2_R, FILLET2_R), FILLET2_R, 180, 90)
            Line((0, FILLET2_R), (0, 0))
            Line((0, 0), (FILLET2_R, 0))
        make_face()
    extrude(amount=51.308, mode=Mode.SUBTRACT)
    with BuildSketch(Plane(origin=(38.354, -13.2715, -16.66875), x_dir=(0, -1, 0), z_dir=(-1, 0, 0))) as fillet2_piece_7:
        with BuildLine():
            CenterArc((5.1435 - FILLET2_R, FILLET2_R), FILLET2_R, 270, 90)
            Line((5.1435, FILLET2_R), (5.1435, 0))
            Line((5.1435, 0), (5.1435 - FILLET2_R, 0))
        make_face()
    revolve(axis=Axis((38.354, -13.2715, -16.66875), (0, 0, 1)), revolution_arc=90, mode=Mode.SUBTRACT)
    with BuildSketch(Plane(origin=(43.4975, -13.2715, -16.66875), x_dir=(-1, 0, 0), z_dir=(0, 1, 0))) as fillet2_piece_8:
        with BuildLine():
            CenterArc((FILLET2_R, FILLET2_R), FILLET2_R, 180, 90)
            Line((0, FILLET2_R), (0, 0))
            Line((0, 0), (FILLET2_R, 0))
        make_face()
    extrude(amount=26.543, mode=Mode.SUBTRACT)
    with BuildSketch(Plane(origin=(38.354, 13.2715, -16.66875), x_dir=(1, 0, 0), z_dir=(0, -1, 0))) as fillet2_piece_9:
        with BuildLine():
            CenterArc((5.1435 - FILLET2_R, FILLET2_R), FILLET2_R, 270, 90)
            Line((5.1435, FILLET2_R), (5.1435, 0))
            Line((5.1435, 0), (5.1435 - FILLET2_R, 0))
        make_face()
    revolve(axis=Axis((38.354, 13.2715, -16.66875), (0, 0, 1)), revolution_arc=90, mode=Mode.SUBTRACT)


solid = part.part
